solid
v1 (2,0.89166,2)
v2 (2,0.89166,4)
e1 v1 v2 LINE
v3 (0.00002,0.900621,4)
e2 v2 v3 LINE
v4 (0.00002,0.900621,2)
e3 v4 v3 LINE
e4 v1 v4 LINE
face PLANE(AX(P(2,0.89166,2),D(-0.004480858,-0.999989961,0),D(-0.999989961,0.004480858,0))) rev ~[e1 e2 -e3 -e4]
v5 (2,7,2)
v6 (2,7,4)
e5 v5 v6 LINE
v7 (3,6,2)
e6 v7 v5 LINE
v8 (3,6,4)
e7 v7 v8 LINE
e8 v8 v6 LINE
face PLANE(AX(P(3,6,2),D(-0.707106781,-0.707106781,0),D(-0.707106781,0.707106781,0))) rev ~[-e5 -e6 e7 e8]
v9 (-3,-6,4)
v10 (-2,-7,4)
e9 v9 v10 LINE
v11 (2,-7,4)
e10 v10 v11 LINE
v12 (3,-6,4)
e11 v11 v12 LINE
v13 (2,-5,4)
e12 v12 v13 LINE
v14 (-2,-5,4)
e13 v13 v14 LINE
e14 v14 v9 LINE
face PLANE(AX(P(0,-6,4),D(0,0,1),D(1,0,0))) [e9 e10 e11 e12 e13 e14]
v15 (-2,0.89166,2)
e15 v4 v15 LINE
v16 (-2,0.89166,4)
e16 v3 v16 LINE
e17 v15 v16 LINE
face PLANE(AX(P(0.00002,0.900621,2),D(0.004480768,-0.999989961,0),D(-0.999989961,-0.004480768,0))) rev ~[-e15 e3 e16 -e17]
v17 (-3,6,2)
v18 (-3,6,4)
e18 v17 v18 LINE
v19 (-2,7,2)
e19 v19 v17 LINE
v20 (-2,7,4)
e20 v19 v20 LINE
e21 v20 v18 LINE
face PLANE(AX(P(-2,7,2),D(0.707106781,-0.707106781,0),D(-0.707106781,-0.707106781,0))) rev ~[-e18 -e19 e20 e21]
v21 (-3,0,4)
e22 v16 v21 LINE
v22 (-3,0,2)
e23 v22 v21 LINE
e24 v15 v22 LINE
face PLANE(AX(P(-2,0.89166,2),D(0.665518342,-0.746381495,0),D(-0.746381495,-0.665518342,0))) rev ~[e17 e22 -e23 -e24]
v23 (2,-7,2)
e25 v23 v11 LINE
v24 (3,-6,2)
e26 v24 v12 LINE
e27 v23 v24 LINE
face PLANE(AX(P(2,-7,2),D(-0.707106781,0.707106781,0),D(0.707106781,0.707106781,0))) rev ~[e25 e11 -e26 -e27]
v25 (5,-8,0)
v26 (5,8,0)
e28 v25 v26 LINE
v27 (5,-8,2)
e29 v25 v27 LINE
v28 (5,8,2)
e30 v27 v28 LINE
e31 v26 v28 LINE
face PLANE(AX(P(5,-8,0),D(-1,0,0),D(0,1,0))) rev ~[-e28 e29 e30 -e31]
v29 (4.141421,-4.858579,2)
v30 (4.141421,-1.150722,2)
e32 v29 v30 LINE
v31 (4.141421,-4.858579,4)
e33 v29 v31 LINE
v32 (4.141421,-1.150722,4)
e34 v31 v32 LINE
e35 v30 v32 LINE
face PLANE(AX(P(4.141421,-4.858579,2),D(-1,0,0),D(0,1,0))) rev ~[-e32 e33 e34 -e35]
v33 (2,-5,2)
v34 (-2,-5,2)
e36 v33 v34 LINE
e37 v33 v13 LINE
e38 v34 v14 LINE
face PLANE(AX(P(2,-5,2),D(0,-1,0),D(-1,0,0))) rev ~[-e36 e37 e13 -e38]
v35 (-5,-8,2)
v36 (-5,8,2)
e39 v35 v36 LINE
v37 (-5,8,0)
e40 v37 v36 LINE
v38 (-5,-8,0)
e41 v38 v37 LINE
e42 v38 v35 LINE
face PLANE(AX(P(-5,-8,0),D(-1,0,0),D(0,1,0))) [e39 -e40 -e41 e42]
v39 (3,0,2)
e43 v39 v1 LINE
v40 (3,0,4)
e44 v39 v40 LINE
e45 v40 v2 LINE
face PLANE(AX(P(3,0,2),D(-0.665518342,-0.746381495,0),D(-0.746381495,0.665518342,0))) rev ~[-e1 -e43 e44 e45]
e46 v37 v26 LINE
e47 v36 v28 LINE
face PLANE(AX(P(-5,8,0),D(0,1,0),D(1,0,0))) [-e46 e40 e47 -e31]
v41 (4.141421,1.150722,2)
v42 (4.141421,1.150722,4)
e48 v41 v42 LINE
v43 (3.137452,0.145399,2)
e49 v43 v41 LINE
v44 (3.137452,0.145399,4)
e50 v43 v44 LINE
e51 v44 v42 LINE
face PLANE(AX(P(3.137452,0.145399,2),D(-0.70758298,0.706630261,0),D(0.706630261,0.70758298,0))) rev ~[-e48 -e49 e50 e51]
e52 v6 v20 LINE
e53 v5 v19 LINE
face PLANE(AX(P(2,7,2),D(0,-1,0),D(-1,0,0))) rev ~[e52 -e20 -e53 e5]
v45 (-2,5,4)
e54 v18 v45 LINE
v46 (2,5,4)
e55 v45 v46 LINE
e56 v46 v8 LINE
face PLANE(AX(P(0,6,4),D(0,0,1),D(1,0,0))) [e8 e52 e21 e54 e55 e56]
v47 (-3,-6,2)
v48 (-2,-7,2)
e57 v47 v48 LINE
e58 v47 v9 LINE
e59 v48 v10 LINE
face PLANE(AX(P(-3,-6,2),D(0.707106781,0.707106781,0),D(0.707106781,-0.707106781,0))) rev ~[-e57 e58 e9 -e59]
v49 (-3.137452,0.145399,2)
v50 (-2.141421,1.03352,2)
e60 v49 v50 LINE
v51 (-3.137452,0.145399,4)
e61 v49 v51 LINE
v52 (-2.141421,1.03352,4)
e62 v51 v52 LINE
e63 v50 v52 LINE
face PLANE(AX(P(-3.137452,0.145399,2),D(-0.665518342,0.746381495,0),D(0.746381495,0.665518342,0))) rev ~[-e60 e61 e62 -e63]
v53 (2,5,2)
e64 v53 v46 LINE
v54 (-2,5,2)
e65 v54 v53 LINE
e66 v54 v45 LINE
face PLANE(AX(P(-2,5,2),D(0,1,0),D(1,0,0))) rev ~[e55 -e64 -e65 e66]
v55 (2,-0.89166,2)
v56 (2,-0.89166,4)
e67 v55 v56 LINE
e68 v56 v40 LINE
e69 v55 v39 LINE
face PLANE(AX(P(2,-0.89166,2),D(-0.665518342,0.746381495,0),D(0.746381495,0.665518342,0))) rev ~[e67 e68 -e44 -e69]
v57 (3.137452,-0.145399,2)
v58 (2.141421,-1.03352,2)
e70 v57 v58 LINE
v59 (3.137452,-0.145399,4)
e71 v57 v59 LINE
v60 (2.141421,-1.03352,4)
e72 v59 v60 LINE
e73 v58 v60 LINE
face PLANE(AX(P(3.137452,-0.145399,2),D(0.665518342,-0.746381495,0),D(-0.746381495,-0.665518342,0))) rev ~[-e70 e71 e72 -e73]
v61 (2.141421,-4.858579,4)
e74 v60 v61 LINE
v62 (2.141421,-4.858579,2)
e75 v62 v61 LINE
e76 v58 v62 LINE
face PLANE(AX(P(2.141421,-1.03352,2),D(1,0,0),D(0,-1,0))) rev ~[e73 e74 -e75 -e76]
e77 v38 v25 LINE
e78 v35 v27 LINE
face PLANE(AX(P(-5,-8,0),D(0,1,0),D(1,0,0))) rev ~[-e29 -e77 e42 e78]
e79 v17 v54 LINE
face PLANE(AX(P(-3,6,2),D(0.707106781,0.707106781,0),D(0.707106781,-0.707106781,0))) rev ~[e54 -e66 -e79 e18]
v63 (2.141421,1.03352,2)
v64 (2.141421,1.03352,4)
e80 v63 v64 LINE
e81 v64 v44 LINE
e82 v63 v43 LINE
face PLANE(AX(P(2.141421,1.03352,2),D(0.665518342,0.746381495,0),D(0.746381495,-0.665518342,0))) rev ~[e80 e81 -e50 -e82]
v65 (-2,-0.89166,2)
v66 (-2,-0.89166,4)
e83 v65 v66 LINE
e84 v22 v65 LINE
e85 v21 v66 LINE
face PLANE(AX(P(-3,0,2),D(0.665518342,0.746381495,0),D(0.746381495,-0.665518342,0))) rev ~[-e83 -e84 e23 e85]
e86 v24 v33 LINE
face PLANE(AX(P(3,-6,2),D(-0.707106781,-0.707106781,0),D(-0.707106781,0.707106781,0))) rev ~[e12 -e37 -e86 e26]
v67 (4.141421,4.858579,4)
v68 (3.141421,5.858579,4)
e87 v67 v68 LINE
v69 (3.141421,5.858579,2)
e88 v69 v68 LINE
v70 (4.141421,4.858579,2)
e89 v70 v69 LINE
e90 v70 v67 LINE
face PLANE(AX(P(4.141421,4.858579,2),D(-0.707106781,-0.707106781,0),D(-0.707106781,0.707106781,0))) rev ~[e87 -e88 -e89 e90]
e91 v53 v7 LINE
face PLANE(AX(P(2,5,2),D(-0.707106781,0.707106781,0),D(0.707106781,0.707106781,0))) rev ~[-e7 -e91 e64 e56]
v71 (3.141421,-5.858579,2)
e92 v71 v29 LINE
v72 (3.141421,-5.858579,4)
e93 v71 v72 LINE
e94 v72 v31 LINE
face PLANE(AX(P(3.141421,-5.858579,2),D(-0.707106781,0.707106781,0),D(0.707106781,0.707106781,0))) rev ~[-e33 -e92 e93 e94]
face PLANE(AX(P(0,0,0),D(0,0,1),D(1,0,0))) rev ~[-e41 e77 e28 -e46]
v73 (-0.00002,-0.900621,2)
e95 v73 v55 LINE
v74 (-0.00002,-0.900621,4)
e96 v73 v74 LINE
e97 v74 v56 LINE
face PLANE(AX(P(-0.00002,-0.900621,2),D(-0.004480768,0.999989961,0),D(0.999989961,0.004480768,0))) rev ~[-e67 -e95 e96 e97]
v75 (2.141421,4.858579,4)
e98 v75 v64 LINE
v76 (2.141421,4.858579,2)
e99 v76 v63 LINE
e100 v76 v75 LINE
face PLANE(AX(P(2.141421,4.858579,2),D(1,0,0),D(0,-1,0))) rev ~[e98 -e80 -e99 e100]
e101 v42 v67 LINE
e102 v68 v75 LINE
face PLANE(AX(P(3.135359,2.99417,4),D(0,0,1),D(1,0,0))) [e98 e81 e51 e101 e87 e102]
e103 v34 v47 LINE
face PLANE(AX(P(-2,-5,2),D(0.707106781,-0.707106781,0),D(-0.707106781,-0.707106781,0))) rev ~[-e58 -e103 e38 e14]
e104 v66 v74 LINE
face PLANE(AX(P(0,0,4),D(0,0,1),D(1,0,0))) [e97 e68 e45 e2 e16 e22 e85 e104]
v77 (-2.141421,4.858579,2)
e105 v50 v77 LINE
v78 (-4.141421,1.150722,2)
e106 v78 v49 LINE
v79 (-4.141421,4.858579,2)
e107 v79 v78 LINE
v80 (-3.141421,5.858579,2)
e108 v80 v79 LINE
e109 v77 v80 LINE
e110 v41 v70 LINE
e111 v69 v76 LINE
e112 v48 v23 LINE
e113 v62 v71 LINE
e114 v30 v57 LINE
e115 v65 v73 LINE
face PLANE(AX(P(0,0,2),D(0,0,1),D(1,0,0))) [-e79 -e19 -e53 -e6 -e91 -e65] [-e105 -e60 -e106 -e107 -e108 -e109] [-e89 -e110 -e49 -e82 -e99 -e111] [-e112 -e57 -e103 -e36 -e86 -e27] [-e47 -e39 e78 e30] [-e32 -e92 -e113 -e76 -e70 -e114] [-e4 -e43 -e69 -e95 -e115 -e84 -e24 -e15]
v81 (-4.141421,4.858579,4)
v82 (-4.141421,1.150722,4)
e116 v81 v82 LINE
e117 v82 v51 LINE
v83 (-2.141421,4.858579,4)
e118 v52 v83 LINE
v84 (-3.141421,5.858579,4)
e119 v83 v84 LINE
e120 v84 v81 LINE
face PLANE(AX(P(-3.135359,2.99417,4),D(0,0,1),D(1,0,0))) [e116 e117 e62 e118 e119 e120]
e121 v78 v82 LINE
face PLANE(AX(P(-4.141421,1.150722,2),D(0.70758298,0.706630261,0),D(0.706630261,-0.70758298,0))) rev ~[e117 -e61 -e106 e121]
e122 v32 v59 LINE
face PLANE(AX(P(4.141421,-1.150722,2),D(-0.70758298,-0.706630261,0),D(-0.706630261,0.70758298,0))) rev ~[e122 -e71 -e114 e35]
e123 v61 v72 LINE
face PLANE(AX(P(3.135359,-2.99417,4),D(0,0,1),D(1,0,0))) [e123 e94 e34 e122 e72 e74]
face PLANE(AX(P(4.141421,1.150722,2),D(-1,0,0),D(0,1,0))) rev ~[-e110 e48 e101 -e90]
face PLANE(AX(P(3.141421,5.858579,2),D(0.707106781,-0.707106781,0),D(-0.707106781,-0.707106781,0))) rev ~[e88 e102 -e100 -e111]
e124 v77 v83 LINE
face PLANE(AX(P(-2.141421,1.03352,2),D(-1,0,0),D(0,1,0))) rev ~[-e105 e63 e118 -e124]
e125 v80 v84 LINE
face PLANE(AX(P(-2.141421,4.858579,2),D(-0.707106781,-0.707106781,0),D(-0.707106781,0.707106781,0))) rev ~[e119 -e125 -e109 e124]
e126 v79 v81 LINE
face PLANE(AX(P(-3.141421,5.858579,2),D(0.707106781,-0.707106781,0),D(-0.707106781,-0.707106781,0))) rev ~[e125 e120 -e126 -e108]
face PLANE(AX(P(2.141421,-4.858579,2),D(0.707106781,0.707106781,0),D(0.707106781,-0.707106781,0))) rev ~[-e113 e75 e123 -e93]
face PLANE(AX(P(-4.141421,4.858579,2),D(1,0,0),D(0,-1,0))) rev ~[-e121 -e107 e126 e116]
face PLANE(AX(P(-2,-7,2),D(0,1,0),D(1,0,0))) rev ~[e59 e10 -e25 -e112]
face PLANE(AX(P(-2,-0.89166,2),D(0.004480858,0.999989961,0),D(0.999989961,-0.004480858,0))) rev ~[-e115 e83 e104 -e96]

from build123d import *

# Parameters (mm, degrees)
F0_W     = 10
F0_H     = 16
F1_DEPTH = 2
F3_DEPTH = 2


# Not quite as in the source:
# - ends of sketch curves that miss each other by under 0.0002 mm in the source are joined


with BuildPart() as f1:
    # F0 (on Top) → F1 (new body)
    with BuildSketch(Plane.XY):
        Rectangle(F0_W, F0_H)
    extrude(amount=F1_DEPTH)

    # F2 (on face) → F3 (join)
    with BuildSketch(Plane.XY.offset(2)):
        Polygon((0, 7), (-2, 7), (-3, 6), (-2, 5), (0, 5), (2, 5), (3, 6), (2, 7), align=None)
        Polygon((-2.1414213562, 4.8585786438), (-3.1414213562, 5.8585786438), (-4.1414213562, 4.8585786438), (-4.1414213562, 1.1507223826), (-3.1374518146, 0.1453992321), (-2.1414213562, 1.0335195075), align=None)
        Polygon((2, 0.891659756), (2.00782e-05, 0.9006214721), (-2, 0.891659756), (-3, 0), (-2, -0.891659756), (-2.00782e-05, -0.9006214721), (2, -0.891659756), (3, 0), align=None)
        Polygon((0, -5), (-2, -5), (-3, -6), (-2, -7), (0, -7), (2, -7), (3, -6), (2, -5), align=None)
        Polygon((4.1414213562, 4.8585786438), (3.1414213562, 5.8585786438), (2.1414213562, 4.8585786438), (2.1414213562, 1.0335195075), (3.1374518146, 0.1453992321), (4.1414213562, 1.1507223826), align=None)
        Polygon((3.1374518146, -0.1453992321), (2.1414213562, -1.0335195075), (2.1414213562, -4.8585786438), (3.1414213562, -5.8585786438), (4.1414213562, -4.8585786438), (4.1414213562, -1.1507223826), align=None)
    extrude(amount=F3_DEPTH)


solid = f1.part
